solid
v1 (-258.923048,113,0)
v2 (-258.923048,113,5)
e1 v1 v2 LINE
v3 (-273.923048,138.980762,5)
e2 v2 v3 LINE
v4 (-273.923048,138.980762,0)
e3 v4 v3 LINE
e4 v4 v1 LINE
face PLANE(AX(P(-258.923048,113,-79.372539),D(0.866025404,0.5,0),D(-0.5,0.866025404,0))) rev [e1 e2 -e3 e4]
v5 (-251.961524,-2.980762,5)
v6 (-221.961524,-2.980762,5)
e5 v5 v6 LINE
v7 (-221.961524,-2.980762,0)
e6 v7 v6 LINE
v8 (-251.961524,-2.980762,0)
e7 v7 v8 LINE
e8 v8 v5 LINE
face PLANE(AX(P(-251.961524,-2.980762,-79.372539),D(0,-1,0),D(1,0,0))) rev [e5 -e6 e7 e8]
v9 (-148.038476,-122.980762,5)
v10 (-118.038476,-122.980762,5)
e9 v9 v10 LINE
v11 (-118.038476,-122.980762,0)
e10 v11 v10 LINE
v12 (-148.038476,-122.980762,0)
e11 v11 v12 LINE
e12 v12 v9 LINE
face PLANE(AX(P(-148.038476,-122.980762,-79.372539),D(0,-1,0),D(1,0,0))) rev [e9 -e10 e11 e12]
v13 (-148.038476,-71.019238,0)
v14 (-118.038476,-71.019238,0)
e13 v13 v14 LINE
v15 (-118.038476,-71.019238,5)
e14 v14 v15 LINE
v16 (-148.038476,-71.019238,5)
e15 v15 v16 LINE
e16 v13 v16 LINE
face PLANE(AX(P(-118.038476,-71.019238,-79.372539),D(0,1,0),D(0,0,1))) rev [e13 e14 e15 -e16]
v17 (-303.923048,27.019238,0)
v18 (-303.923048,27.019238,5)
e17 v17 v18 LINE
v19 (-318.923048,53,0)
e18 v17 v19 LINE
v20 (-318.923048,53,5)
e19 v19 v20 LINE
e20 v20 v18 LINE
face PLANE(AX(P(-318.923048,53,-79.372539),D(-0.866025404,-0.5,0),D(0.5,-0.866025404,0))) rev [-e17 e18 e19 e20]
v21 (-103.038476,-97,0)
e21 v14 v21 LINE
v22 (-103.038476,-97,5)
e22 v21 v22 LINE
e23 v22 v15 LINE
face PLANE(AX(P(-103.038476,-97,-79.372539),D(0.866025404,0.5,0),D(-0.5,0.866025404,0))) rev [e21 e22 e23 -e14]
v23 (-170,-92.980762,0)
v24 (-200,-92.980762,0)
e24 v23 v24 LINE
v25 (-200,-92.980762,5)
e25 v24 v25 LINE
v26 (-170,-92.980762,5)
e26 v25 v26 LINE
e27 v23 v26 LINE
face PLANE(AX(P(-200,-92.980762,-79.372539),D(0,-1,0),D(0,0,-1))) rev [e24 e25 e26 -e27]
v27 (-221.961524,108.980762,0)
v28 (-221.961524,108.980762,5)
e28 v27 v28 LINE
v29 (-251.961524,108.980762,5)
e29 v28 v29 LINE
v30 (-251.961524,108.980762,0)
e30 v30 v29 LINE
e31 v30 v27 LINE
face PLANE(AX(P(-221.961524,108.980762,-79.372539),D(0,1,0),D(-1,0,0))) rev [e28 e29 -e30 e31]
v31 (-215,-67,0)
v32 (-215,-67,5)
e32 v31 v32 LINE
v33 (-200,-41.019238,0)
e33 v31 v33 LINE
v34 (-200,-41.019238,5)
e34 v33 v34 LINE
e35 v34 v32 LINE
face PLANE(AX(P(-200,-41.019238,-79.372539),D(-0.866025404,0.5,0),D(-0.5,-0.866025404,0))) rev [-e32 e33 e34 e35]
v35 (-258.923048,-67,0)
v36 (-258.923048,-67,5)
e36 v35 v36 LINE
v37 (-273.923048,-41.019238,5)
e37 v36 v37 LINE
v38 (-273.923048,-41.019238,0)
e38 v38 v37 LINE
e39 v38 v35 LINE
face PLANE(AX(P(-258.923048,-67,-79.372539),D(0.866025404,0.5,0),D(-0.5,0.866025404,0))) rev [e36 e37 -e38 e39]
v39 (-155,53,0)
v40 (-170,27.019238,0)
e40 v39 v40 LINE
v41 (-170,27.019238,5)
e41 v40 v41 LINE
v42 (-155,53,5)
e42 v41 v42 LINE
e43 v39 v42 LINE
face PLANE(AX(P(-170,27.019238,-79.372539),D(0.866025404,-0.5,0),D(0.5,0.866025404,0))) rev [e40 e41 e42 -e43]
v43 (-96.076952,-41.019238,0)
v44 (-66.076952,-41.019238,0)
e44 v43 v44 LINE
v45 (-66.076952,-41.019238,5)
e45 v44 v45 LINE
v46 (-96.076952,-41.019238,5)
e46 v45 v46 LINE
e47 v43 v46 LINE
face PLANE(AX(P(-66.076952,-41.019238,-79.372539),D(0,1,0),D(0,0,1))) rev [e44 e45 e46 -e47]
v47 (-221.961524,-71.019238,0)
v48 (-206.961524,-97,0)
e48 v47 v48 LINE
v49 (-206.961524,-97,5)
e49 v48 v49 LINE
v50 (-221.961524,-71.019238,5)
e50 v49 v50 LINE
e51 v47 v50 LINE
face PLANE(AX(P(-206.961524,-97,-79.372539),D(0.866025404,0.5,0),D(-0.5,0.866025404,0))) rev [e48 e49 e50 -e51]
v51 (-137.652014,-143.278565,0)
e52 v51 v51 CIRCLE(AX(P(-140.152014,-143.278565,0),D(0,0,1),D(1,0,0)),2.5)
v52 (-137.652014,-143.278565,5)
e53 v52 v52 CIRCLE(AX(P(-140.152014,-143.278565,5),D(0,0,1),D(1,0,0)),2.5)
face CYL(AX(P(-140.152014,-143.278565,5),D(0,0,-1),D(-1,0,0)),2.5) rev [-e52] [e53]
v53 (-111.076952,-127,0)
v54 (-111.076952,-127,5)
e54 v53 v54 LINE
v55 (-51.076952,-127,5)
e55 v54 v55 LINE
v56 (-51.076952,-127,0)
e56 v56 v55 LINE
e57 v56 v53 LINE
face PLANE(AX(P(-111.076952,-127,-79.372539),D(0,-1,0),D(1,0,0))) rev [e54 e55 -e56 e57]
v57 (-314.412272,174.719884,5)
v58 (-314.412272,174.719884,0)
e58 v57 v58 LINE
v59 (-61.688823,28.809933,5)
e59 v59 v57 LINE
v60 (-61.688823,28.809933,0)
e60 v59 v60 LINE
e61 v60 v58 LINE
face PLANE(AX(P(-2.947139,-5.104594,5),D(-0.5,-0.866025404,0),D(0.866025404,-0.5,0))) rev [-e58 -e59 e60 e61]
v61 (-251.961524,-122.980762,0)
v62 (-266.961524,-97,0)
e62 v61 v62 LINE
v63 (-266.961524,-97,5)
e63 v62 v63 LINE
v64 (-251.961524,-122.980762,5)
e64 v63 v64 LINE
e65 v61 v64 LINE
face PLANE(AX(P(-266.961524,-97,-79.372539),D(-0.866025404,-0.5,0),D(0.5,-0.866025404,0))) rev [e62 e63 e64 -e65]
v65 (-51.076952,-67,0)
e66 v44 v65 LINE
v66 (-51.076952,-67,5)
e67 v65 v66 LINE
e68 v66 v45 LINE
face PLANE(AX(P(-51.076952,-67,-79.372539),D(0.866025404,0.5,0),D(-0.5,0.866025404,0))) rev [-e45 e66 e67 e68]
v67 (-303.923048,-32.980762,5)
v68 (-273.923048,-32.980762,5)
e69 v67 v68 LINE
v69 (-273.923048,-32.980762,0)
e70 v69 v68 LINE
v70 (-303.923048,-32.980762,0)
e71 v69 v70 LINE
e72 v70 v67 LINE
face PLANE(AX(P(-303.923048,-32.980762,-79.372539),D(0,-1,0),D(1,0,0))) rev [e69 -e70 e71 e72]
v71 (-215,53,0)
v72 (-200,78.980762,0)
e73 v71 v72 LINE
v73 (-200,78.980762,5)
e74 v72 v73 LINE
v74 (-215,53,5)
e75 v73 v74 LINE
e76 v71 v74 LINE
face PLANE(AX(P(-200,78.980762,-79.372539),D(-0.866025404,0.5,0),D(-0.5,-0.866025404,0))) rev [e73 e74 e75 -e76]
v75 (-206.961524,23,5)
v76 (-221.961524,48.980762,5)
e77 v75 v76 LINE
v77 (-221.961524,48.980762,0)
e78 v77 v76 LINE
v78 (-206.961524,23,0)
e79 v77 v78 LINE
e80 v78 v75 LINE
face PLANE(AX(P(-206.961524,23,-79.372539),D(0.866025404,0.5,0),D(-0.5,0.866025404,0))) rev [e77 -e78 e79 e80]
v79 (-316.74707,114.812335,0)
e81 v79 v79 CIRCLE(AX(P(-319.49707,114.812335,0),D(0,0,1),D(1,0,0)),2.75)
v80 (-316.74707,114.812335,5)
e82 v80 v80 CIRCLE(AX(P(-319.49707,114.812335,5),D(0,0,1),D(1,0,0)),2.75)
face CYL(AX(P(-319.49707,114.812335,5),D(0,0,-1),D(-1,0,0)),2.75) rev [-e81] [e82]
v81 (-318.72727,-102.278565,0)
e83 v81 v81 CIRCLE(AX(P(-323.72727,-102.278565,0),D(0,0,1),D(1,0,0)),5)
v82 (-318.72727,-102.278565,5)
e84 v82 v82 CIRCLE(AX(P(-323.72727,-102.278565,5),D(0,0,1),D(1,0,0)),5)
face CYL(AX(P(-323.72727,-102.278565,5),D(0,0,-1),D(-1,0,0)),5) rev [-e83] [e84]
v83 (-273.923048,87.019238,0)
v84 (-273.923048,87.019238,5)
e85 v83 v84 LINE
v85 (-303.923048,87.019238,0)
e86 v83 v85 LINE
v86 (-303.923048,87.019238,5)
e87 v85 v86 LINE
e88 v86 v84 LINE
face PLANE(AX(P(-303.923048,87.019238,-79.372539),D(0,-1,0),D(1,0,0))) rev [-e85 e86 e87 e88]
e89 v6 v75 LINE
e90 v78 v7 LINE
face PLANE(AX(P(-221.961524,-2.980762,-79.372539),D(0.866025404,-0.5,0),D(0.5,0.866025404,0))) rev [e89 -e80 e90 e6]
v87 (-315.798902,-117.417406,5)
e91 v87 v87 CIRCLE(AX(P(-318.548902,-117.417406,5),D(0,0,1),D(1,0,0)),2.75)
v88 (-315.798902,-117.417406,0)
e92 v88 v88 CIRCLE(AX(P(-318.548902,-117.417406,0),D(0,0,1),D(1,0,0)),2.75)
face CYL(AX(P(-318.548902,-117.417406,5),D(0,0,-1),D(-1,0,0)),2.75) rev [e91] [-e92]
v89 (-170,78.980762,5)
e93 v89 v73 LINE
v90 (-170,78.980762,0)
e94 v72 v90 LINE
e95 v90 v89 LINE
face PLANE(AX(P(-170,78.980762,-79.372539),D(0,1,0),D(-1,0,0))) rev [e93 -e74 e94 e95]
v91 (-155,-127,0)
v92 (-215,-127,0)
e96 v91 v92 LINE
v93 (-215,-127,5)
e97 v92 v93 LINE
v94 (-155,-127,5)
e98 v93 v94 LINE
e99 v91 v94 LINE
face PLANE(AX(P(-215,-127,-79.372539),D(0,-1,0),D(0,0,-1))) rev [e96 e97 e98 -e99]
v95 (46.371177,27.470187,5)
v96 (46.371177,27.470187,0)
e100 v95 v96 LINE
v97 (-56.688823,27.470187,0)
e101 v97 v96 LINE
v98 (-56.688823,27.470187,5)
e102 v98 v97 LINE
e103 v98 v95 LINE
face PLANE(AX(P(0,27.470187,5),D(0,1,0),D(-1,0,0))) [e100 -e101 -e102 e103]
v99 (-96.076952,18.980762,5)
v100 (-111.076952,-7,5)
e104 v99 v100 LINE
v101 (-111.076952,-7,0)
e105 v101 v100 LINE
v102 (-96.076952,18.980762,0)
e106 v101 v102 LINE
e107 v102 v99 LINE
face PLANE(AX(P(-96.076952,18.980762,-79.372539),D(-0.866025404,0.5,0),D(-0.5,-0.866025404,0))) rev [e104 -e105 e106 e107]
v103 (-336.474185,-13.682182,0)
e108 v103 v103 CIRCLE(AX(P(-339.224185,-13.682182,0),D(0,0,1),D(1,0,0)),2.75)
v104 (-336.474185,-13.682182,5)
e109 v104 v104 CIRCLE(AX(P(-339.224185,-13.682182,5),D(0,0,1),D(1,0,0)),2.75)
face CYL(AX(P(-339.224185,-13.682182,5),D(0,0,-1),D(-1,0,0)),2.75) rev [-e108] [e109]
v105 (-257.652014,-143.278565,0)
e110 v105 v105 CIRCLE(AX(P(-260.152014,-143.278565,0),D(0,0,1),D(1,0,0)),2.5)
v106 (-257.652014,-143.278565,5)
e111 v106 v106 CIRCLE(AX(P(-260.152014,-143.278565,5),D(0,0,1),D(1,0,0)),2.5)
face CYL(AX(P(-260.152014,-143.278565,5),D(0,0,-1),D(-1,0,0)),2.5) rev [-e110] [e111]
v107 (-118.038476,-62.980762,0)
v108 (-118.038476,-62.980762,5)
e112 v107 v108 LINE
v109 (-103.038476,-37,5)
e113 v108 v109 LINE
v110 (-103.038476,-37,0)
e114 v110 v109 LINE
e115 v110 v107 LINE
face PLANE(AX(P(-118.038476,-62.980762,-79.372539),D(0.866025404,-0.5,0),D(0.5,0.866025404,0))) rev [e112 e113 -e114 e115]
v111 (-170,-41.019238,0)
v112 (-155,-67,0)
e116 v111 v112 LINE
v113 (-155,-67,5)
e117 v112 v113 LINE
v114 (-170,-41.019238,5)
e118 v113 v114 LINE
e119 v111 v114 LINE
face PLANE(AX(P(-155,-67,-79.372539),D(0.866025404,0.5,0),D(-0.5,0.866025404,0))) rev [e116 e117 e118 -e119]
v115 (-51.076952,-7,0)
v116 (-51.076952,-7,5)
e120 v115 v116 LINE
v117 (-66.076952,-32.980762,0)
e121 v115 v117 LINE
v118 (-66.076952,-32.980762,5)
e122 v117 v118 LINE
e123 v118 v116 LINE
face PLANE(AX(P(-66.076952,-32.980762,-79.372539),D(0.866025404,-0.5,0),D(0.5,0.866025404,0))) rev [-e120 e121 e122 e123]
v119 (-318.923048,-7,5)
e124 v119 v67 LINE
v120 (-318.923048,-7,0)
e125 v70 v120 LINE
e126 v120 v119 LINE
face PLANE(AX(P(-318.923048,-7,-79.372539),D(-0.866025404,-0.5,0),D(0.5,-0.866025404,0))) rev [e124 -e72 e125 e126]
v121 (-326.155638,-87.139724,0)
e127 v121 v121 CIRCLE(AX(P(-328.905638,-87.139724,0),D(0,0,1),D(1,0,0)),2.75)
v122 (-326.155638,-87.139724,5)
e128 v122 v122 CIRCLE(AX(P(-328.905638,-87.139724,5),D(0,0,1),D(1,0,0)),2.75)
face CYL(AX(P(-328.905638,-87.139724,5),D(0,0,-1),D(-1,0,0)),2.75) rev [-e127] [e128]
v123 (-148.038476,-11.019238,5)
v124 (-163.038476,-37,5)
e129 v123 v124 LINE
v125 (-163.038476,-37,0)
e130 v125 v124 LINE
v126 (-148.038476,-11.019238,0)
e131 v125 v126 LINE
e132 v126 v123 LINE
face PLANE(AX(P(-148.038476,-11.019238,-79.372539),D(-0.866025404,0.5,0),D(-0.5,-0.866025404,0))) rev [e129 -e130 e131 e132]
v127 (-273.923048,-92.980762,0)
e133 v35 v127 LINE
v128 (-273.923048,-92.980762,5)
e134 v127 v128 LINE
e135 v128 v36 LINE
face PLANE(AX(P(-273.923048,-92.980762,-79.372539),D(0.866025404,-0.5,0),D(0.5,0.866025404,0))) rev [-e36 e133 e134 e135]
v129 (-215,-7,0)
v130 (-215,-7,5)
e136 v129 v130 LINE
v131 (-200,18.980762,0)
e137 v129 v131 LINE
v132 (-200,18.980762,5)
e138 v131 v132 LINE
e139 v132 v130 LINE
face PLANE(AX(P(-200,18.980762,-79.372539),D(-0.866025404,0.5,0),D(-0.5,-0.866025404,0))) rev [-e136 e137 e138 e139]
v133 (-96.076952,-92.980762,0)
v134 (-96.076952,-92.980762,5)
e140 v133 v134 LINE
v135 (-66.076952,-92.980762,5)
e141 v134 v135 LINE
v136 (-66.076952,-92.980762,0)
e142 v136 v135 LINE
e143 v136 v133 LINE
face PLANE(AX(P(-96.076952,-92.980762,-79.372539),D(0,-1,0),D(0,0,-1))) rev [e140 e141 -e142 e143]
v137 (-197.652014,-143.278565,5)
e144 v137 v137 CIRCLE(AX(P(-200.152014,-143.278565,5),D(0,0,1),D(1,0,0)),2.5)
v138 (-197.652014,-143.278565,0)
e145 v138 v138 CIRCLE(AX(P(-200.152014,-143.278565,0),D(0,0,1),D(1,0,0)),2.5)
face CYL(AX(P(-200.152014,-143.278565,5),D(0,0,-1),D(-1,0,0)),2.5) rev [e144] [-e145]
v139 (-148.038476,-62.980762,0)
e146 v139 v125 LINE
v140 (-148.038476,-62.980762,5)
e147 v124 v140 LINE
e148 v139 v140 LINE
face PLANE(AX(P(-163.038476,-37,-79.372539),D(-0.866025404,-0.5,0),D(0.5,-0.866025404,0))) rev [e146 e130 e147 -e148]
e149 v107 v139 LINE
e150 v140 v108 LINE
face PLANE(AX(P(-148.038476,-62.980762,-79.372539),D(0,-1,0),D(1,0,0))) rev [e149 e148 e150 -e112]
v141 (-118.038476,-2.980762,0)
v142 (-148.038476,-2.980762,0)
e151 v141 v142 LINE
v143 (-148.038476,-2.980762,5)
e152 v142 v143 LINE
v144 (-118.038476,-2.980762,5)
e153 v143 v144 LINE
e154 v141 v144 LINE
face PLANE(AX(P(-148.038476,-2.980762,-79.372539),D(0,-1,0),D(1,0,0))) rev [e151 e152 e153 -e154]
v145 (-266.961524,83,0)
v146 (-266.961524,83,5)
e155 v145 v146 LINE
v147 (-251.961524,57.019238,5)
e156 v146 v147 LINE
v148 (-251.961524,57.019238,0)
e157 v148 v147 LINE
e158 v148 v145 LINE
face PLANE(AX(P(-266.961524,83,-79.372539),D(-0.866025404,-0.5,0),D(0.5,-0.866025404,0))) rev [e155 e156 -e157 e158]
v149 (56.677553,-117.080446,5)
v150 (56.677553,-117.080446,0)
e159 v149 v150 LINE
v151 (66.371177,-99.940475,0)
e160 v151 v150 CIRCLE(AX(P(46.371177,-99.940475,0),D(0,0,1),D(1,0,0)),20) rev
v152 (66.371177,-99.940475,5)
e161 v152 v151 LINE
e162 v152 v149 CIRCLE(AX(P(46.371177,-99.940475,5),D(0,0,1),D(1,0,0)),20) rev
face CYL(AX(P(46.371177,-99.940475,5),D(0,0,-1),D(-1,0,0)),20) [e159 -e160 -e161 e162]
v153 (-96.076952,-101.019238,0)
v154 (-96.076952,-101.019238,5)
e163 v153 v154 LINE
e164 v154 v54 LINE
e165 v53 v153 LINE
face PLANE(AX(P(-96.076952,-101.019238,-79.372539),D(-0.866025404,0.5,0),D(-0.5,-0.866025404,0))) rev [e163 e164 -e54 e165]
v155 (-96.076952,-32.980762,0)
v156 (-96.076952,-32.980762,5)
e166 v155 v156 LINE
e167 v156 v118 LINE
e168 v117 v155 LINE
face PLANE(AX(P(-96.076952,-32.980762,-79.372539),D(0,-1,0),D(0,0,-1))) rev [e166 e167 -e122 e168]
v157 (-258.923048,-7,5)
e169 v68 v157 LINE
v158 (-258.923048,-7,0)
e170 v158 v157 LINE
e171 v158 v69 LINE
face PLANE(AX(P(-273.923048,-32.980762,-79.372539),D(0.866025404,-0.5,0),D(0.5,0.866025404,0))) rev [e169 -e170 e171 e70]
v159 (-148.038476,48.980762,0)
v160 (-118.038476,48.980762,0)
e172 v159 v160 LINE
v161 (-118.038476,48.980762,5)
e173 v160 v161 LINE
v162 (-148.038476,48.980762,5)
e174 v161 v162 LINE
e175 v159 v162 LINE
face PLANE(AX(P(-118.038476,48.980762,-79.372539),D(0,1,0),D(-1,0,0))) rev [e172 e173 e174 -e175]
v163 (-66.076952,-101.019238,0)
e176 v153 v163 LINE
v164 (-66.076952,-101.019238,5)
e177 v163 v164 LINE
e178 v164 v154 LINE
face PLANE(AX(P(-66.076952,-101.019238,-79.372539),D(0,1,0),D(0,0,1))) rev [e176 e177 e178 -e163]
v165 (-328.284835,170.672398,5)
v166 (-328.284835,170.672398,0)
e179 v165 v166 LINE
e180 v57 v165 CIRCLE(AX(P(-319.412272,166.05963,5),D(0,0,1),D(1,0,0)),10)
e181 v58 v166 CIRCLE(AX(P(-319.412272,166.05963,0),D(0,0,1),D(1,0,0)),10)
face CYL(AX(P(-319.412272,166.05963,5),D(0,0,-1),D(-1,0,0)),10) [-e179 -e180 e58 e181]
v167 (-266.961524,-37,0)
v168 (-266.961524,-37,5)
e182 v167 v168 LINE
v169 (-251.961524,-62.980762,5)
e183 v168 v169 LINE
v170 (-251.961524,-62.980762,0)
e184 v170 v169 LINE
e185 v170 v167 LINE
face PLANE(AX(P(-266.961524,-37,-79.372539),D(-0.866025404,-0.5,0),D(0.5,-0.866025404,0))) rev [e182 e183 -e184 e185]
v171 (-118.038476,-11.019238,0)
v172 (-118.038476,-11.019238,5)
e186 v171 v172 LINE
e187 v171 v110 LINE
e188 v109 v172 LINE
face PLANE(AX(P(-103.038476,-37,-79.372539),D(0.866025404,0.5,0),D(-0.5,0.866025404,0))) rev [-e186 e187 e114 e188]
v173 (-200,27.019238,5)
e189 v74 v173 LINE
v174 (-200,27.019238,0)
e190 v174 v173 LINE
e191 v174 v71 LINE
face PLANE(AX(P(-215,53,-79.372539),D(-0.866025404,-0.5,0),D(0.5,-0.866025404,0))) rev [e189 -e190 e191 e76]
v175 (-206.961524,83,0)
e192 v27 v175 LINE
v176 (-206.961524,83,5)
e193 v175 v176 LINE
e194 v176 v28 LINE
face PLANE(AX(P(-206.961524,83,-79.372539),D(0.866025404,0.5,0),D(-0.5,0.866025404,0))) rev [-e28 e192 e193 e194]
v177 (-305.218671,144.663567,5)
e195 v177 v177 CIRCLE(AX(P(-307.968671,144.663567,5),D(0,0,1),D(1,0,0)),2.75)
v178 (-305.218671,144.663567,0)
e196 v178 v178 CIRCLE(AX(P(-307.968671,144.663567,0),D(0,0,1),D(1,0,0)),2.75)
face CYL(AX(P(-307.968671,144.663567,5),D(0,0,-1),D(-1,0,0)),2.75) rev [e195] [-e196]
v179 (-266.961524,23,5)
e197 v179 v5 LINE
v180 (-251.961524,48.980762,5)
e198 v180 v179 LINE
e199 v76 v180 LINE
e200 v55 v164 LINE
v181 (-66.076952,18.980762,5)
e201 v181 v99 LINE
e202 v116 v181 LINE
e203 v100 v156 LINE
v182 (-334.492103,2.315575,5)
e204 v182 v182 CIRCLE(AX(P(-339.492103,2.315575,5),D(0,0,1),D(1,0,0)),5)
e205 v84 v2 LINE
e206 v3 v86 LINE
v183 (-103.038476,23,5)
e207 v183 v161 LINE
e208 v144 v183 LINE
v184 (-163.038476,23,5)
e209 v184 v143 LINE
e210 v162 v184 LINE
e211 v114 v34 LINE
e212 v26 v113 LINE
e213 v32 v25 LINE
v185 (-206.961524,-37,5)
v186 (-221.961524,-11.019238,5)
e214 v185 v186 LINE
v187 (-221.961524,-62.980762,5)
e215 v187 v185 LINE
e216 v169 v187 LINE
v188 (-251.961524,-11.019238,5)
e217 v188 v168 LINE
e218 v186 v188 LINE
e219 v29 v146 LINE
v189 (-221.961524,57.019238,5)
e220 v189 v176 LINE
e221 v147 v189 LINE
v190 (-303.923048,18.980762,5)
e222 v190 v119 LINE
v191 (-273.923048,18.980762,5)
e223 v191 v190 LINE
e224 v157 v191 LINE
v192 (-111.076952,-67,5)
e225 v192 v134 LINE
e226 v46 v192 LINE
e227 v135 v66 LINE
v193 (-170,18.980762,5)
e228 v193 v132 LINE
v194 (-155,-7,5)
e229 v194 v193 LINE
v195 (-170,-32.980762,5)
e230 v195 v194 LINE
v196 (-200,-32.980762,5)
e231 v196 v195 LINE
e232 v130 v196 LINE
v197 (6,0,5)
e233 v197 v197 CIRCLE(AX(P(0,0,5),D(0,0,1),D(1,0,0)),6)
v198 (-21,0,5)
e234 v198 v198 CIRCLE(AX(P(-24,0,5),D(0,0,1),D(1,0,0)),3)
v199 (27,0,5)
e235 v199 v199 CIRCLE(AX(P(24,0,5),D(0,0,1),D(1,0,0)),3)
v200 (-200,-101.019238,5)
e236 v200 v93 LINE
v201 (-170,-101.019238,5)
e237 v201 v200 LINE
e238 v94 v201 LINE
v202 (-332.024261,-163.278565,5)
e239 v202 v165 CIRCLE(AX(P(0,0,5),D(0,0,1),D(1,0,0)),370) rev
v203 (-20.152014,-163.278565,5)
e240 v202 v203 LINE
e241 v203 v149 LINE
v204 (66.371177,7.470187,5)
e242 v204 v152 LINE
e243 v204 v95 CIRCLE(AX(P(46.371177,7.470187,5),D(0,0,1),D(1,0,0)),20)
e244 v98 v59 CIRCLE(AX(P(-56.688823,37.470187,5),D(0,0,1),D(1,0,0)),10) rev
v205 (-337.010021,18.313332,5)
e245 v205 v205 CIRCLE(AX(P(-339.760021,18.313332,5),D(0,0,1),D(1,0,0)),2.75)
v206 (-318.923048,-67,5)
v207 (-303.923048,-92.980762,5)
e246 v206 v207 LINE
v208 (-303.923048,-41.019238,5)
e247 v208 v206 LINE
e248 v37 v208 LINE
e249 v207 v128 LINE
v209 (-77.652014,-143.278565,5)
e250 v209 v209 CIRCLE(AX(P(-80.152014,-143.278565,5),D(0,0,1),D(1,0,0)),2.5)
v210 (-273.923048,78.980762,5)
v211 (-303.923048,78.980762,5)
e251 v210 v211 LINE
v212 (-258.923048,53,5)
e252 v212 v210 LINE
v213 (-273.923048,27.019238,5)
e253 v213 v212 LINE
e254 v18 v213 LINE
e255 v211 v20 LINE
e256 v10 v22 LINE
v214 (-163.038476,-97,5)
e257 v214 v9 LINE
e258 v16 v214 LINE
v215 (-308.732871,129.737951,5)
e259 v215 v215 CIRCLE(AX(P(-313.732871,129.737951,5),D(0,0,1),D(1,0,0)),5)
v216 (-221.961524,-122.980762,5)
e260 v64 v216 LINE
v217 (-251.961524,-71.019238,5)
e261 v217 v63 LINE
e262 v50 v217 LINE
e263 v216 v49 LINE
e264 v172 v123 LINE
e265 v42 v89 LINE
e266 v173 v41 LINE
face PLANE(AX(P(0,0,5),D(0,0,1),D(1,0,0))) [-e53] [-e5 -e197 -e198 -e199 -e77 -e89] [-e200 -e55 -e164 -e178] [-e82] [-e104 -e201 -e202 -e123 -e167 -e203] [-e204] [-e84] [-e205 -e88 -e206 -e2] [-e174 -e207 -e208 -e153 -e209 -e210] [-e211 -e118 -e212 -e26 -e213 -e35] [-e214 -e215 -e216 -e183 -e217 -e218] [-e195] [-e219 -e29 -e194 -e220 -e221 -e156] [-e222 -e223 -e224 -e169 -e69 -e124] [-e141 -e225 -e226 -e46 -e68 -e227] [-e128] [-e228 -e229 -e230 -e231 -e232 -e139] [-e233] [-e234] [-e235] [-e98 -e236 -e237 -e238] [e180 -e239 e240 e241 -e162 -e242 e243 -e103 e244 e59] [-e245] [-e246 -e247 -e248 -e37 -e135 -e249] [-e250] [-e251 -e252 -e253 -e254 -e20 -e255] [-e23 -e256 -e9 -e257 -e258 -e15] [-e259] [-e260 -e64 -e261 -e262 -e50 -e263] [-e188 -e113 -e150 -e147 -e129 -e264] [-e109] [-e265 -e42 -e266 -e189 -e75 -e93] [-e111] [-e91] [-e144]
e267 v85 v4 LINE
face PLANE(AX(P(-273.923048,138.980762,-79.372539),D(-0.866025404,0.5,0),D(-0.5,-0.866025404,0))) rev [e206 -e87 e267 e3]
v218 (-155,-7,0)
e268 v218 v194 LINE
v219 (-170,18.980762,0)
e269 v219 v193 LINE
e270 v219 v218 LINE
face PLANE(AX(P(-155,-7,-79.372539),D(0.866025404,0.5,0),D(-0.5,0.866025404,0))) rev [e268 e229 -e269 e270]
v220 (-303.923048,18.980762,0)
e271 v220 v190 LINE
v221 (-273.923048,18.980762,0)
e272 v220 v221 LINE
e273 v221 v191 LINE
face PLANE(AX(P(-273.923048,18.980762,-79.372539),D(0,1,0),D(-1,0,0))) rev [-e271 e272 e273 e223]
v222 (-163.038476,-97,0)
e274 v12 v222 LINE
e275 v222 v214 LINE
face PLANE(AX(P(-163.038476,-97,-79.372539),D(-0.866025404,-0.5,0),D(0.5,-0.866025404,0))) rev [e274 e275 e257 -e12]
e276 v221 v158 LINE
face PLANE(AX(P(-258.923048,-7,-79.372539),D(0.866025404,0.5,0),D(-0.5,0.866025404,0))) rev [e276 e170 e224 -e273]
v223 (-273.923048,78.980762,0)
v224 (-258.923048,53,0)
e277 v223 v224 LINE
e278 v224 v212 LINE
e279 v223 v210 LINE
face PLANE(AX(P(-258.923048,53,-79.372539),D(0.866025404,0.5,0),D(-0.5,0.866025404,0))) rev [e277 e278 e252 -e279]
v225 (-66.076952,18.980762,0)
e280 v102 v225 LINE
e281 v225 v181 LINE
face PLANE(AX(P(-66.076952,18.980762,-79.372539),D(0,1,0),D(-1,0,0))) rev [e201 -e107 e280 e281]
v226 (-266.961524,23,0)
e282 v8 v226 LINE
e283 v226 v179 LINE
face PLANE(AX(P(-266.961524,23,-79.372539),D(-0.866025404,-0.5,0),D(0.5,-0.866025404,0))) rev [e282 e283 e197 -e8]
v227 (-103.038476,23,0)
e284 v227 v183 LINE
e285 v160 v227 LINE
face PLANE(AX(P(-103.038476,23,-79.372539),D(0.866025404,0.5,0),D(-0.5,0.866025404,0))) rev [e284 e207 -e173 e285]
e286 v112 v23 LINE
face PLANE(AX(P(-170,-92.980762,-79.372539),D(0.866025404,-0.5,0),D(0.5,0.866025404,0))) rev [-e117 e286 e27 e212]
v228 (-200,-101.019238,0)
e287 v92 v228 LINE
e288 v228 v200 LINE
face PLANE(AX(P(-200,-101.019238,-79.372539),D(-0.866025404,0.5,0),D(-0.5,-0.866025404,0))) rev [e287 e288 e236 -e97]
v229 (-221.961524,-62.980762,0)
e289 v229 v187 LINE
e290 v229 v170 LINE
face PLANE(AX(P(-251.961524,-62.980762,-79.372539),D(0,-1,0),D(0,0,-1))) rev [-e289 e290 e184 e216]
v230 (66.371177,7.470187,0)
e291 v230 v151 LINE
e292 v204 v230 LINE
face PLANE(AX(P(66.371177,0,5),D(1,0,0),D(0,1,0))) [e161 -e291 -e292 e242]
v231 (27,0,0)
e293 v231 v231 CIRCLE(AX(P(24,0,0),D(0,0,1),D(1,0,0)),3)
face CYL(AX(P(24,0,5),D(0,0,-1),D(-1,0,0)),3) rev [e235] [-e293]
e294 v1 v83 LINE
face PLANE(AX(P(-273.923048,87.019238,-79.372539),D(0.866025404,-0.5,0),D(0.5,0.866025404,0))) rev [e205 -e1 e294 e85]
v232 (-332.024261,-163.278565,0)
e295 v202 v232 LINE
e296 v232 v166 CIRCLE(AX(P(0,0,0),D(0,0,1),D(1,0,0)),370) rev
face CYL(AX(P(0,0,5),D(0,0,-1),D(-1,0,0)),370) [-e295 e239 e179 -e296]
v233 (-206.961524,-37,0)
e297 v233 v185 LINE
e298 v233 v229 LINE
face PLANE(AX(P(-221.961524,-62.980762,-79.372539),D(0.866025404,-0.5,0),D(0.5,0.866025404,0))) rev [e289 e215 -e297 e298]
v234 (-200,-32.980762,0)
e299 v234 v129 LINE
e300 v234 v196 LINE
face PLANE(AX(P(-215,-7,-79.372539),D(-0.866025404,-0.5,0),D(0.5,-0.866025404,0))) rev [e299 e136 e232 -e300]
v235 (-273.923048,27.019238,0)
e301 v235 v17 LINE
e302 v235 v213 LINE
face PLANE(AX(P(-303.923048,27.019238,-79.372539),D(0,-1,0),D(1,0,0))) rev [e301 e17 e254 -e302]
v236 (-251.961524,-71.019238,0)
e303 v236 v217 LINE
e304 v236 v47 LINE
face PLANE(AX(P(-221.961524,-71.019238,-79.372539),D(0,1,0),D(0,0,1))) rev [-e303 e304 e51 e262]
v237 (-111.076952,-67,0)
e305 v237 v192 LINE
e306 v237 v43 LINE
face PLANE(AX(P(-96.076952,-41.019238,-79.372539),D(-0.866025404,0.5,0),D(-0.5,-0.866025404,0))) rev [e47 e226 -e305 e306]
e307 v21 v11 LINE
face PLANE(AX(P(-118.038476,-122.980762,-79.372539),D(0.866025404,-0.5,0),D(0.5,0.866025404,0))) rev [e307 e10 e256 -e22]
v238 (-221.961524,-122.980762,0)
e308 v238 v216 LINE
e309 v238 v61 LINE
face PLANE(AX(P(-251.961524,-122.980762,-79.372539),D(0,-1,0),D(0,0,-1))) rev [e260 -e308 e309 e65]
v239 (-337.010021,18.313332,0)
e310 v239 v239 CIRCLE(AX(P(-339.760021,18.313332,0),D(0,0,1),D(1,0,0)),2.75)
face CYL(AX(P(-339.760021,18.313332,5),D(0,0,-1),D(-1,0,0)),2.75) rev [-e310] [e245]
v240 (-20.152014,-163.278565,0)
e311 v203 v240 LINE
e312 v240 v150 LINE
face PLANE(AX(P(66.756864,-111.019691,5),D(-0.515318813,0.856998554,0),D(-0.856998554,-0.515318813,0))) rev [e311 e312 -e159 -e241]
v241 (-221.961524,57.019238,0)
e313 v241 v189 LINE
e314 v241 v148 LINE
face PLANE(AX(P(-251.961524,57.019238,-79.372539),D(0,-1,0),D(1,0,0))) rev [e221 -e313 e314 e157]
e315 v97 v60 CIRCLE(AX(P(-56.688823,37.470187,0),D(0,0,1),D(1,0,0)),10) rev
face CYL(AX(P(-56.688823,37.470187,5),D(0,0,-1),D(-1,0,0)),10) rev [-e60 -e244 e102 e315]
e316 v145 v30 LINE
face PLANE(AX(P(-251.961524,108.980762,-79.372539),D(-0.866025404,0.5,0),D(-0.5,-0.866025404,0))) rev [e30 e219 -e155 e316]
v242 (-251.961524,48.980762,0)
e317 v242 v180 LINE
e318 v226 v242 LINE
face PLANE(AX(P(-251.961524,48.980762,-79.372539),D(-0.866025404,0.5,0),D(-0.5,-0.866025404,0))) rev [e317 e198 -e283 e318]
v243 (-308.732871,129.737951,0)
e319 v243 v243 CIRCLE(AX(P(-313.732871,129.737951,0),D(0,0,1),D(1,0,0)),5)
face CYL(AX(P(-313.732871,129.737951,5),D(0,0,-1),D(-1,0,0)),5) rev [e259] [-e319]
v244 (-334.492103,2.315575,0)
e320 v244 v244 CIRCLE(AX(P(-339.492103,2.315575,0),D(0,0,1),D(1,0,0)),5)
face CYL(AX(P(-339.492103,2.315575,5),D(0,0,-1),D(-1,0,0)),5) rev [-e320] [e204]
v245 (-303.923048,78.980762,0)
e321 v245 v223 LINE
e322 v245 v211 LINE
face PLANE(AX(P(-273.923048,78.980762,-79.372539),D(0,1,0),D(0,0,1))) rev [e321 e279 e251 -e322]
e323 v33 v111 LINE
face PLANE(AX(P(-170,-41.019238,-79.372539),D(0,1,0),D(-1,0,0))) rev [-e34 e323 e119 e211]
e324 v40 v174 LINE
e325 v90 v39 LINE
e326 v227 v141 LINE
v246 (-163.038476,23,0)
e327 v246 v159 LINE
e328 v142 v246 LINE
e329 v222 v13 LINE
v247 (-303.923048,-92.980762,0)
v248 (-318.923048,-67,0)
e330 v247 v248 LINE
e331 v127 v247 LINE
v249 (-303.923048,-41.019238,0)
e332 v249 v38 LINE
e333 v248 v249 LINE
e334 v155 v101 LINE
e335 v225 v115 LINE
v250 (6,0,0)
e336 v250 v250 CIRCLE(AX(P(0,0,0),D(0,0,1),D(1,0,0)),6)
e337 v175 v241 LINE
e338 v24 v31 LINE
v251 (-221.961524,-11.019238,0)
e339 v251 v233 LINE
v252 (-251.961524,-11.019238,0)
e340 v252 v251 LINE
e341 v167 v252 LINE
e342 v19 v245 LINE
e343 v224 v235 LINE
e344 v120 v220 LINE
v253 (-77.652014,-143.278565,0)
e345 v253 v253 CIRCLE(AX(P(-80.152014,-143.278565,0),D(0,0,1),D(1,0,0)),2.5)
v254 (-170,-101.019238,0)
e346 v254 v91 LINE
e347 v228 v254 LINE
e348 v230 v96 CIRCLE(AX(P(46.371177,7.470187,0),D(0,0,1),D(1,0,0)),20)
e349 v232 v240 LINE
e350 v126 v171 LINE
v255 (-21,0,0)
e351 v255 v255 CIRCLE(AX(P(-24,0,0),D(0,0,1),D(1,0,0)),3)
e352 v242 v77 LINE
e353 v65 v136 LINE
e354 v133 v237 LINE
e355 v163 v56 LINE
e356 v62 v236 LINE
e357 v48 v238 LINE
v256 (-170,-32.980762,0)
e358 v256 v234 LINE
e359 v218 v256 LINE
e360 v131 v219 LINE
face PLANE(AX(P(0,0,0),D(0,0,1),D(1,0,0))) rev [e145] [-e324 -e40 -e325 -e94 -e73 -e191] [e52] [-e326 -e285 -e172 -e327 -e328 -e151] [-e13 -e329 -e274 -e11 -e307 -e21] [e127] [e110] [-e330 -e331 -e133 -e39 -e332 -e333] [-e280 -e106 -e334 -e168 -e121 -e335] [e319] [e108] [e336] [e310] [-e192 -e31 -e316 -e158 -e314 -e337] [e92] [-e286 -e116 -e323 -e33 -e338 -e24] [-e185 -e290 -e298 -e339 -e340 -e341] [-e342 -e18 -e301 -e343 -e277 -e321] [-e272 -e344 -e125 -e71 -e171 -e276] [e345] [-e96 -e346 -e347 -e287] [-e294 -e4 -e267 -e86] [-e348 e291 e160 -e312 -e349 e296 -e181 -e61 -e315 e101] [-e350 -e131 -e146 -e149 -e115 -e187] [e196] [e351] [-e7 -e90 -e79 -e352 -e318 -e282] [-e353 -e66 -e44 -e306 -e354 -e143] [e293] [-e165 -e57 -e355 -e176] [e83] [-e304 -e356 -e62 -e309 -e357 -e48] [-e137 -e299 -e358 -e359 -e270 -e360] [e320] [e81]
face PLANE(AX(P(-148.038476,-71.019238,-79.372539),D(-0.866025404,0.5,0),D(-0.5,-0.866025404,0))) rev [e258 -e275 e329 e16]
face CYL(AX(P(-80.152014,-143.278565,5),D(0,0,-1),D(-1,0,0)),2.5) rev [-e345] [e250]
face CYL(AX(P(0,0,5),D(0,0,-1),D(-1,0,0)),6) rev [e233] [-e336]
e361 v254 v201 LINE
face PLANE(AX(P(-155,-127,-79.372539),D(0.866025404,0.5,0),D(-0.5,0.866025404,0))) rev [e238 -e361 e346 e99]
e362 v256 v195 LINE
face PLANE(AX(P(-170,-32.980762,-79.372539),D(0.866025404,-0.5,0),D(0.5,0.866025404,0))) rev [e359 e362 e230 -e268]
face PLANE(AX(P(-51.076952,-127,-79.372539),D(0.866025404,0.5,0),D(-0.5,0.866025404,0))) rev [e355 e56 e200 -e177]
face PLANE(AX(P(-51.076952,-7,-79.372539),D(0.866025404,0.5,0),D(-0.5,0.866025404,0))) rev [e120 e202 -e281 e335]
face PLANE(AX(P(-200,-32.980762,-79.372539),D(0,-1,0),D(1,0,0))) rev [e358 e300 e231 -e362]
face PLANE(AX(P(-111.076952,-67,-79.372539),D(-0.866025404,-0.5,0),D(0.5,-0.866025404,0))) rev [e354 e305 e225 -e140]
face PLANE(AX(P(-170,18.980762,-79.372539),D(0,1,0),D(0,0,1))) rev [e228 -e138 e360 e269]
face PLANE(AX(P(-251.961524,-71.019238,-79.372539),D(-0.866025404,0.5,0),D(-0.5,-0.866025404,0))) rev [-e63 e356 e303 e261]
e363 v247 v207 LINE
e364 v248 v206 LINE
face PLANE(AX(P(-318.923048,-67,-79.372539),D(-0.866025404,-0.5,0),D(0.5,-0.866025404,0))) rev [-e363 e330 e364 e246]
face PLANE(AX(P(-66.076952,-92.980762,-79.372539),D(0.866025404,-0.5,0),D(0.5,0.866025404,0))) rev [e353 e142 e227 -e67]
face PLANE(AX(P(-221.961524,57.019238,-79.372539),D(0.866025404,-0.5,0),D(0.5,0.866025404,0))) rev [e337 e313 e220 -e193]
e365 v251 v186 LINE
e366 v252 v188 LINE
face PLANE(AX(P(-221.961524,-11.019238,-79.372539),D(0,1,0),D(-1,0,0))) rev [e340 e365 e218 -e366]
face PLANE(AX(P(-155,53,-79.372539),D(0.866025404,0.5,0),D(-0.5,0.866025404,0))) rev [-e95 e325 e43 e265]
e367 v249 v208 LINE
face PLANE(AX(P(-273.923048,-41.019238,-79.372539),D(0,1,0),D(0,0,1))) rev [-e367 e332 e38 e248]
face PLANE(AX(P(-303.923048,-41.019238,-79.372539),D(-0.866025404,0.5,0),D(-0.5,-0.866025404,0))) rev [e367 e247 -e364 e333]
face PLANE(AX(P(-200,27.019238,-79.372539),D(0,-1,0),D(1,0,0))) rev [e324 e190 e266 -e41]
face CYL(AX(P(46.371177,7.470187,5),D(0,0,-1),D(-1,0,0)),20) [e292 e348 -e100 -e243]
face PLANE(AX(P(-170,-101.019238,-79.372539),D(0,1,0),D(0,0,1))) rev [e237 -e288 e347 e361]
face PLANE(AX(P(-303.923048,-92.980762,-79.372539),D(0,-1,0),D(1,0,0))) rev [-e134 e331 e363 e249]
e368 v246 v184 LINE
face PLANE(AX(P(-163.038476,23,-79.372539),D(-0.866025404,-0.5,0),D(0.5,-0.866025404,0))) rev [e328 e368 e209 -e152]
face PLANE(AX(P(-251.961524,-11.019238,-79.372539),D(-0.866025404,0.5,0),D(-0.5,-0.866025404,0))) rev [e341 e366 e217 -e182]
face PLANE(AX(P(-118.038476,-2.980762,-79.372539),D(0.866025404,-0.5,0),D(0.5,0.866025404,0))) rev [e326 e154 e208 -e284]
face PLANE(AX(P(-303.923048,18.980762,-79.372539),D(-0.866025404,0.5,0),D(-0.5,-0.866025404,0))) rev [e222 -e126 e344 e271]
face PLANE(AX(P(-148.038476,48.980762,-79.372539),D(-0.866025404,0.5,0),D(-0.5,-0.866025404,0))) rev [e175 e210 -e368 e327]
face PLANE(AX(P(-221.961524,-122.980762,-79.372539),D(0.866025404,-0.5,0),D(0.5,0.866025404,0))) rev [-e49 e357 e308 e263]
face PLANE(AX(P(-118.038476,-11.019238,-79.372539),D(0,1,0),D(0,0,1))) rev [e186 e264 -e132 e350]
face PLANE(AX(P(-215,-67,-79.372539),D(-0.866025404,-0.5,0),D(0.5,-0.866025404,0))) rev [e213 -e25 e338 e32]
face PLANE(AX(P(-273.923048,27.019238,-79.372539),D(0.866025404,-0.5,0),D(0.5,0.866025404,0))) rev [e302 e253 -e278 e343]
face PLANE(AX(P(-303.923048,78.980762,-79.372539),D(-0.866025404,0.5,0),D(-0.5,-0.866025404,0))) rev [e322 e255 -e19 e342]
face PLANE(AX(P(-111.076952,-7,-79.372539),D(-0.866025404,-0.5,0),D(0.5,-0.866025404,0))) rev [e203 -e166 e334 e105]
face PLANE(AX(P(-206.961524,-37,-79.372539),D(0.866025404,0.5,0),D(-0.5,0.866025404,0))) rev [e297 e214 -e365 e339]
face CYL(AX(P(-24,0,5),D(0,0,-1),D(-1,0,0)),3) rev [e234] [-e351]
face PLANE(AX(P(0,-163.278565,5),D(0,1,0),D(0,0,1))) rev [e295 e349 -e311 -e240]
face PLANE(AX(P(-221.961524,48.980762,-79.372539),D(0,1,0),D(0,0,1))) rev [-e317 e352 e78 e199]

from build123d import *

# Parameters (mm, degrees)
BOSS_EXTRUDE1_OUTLINE_R   = 2.75
BOSS_EXTRUDE1_OUTLINE_R_2 = 5
BOSS_EXTRUDE1_OUTLINE_R_3 = 2.499999993
BOSS_EXTRUDE1_OUTLINE_R_4 = 3
BOSS_EXTRUDE1_OUTLINE_R_5 = 6
BOSS_EXTRUDE1_DEPTH       = 5
CUT_EXTRUDE1_DEPTH        = 5


# Read off the part's stored shape, not the designer's step: Boss-Extrude1
with BuildPart() as part:
    # Boss-Extrude1 outline → Boss-Extrude1 (new body)
    with BuildSketch(Plane.XY):
        with BuildLine():
            ThreePointArc((56.677553307, -117.080446425), (63.779903671, -109.786095566), (66.371177049, -99.940475351))
            Line((66.371177049, -99.940475351), (66.371177049, 7.470187014))
            ThreePointArc((66.371177049, 7.470187014), (60.513312673, 21.612322638), (46.371177049, 27.470187014))
            Line((46.371177049, 27.470187014), (-56.688822951, 27.470187014))
            ThreePointArc((-56.688822951, 27.470187014), (-59.277013402, 27.810928751), (-61.688822951, 28.809932976))
            Line((-61.688822951, 28.809932976), (-314.412271613, 174.719884092))
            ThreePointArc((-314.412271613, 174.719884092), (-322.213114889, 175.659384058), (-328.284834714, 170.672397556))
            ThreePointArc((-328.284834714, 170.672397556), (-369.976805992, 4.142827069), (-332.024261256, -163.278565422))
            Line((-332.024261256, -163.278565422), (-20.152013506, -163.278565422))
            Line((-20.152013506, -163.278565422), (56.677553307, -117.080446425))
        make_face()
        with Locations((-318.548901543, -117.417406357)):
            Circle(BOSS_EXTRUDE1_OUTLINE_R, mode=Mode.SUBTRACT)
        with Locations((-323.727269541, -102.278565422)):
            Circle(BOSS_EXTRUDE1_OUTLINE_R_2, mode=Mode.SUBTRACT)
        with Locations((-328.90563754, -87.139724486)):
            Circle(BOSS_EXTRUDE1_OUTLINE_R, mode=Mode.SUBTRACT)
        with Locations((-260.152013506, -143.278565422)):
            Circle(BOSS_EXTRUDE1_OUTLINE_R_3, mode=Mode.SUBTRACT)
        with Locations((-200.152013506, -143.278565422)):
            Circle(BOSS_EXTRUDE1_OUTLINE_R_3, mode=Mode.SUBTRACT)
        with Locations((-339.2241853, -13.682181731)):
            Circle(BOSS_EXTRUDE1_OUTLINE_R, mode=Mode.SUBTRACT)
        with Locations((-339.492103151, 2.315574988)):
            Circle(BOSS_EXTRUDE1_OUTLINE_R_2, mode=Mode.SUBTRACT)
        with Locations((-140.152013506, -143.278565422)):
            Circle(BOSS_EXTRUDE1_OUTLINE_R_3, mode=Mode.SUBTRACT)
        with Locations((-80.152013506, -143.278565422)):
            Circle(BOSS_EXTRUDE1_OUTLINE_R_3, mode=Mode.SUBTRACT)
        with Locations((-24, 0)):
            Circle(BOSS_EXTRUDE1_OUTLINE_R_4, mode=Mode.SUBTRACT)
        with Locations((1.6e-08, 2e-09)):
            Circle(BOSS_EXTRUDE1_OUTLINE_R_5, mode=Mode.SUBTRACT)
        with Locations((24, 0)):
            Circle(BOSS_EXTRUDE1_OUTLINE_R_4, mode=Mode.SUBTRACT)
        with Locations((-339.760021002, 18.313331706)):
            Circle(BOSS_EXTRUDE1_OUTLINE_R, mode=Mode.SUBTRACT)
        with Locations((-319.497069854, 114.812335336)):
            Circle(BOSS_EXTRUDE1_OUTLINE_R, mode=Mode.SUBTRACT)
        with Locations((-313.732870505, 129.737951098)):
            Circle(BOSS_EXTRUDE1_OUTLINE_R_2, mode=Mode.SUBTRACT)
        with Locations((-307.968671157, 144.66356686)):
            Circle(BOSS_EXTRUDE1_OUTLINE_R, mode=Mode.SUBTRACT)
    extrude(amount=BOSS_EXTRUDE1_DEPTH)

    # Sketch2 → Cut-Extrude1 (cut)
    with BuildSketch(Plane.XY.offset(5)):
        Polygon((-155, -7), (-170, 18.980762114), (-200, 18.980762114), (-215, -7), (-200, -32.980762114), (-170, -32.980762114), align=None)
        Polygon((-103.038475773, -37), (-118.038475773, -11.019237886), (-148.038475773, -11.019237886), (-163.038475773, -37), (-148.038475773, -62.980762114), (-118.038475773, -62.980762114), align=None)
        Polygon((-215, -127), (-155, -127), (-170, -101.019237886), (-200, -101.019237886), align=None)
        Polygon((-111.076951546, -127), (-51.076951546, -127), (-66.076951546, -101.019237886), (-96.076951546, -101.019237886), align=None)
        Polygon((-51.076951546, -67), (-66.076951546, -41.019237886), (-96.076951546, -41.019237886), (-111.076951546, -67), (-96.076951546, -92.980762114), (-66.076951546, -92.980762114), align=None)
        Polygon((-118.038475773, -2.980762114), (-103.038475773, 23), (-118.038475773, 48.980762114), (-148.038475773, 48.980762114), (-163.038475773, 23), (-148.038475773, -2.980762114), align=None)
        Polygon((-258.923048454, 53), (-273.923048454, 78.980762114), (-303.923048454, 78.980762114), (-318.923048454, 53), (-303.923048454, 27.019237886), (-273.923048454, 27.019237886), align=None)
        Polygon((-206.961524227, 23), (-221.961524227, 48.980762114), (-251.961524227, 48.980762114), (-266.961524227, 23), (-251.961524227, -2.980762114), (-221.961524227, -2.980762114), align=None)
        Polygon((-221.961524227, 57.019237886), (-206.961524227, 83), (-221.961524227, 108.980762114), (-251.961524227, 108.980762114), (-266.961524227, 83), (-251.961524227, 57.019237886), align=None)
        Polygon((-170, 27.019237886), (-155, 53), (-170, 78.980762114), (-200, 78.980762114), (-215, 53), (-200, 27.019237886), align=None)
        Polygon((-66.076951546, -32.980762114), (-51.076951546, -7), (-66.076951546, 18.980762114), (-96.076951546, 18.980762114), (-111.076951546, -7), (-96.076951546, -32.980762114), align=None)
        Polygon((-103.038475773, -97), (-118.038475773, -71.019237886), (-148.038475773, -71.019237886), (-163.038475773, -97), (-148.038475773, -122.980762114), (-118.038475773, -122.980762114), align=None)
        Polygon((-170, -41.019237886), (-200, -41.019237886), (-215, -67), (-200, -92.980762114), (-170, -92.980762114), (-155, -67), align=None)
        Polygon((-273.923048454, -32.980762114), (-258.923048454, -7), (-273.923048454, 18.980762114), (-303.923048454, 18.980762114), (-318.923048454, -7), (-303.923048454, -32.980762114), align=None)
        Polygon((-221.961524227, -62.980762114), (-206.961524227, -37), (-221.961524227, -11.019237886), (-251.961524227, -11.019237886), (-266.961524227, -37), (-251.961524227, -62.980762114), align=None)
        Polygon((-273.923048454, 87.019237886), (-258.923048454, 113), (-273.923048454, 138.980762114), (-303.923048454, 87.019237886), align=None)
        Polygon((-303.923048454, -92.980762114), (-273.923048454, -92.980762114), (-258.923048454, -67), (-273.923048454, -41.019237886), (-303.923048454, -41.019237886), (-318.923048454, -67), align=None)
        Polygon((-206.961524227, -97), (-221.961524227, -71.019237886), (-251.961524227, -71.019237886), (-266.961524227, -97), (-251.961524227, -122.980762114), (-221.961524227, -122.980762114), align=None)
    extrude(amount=-CUT_EXTRUDE1_DEPTH, mode=Mode.SUBTRACT)


solid = part.part
